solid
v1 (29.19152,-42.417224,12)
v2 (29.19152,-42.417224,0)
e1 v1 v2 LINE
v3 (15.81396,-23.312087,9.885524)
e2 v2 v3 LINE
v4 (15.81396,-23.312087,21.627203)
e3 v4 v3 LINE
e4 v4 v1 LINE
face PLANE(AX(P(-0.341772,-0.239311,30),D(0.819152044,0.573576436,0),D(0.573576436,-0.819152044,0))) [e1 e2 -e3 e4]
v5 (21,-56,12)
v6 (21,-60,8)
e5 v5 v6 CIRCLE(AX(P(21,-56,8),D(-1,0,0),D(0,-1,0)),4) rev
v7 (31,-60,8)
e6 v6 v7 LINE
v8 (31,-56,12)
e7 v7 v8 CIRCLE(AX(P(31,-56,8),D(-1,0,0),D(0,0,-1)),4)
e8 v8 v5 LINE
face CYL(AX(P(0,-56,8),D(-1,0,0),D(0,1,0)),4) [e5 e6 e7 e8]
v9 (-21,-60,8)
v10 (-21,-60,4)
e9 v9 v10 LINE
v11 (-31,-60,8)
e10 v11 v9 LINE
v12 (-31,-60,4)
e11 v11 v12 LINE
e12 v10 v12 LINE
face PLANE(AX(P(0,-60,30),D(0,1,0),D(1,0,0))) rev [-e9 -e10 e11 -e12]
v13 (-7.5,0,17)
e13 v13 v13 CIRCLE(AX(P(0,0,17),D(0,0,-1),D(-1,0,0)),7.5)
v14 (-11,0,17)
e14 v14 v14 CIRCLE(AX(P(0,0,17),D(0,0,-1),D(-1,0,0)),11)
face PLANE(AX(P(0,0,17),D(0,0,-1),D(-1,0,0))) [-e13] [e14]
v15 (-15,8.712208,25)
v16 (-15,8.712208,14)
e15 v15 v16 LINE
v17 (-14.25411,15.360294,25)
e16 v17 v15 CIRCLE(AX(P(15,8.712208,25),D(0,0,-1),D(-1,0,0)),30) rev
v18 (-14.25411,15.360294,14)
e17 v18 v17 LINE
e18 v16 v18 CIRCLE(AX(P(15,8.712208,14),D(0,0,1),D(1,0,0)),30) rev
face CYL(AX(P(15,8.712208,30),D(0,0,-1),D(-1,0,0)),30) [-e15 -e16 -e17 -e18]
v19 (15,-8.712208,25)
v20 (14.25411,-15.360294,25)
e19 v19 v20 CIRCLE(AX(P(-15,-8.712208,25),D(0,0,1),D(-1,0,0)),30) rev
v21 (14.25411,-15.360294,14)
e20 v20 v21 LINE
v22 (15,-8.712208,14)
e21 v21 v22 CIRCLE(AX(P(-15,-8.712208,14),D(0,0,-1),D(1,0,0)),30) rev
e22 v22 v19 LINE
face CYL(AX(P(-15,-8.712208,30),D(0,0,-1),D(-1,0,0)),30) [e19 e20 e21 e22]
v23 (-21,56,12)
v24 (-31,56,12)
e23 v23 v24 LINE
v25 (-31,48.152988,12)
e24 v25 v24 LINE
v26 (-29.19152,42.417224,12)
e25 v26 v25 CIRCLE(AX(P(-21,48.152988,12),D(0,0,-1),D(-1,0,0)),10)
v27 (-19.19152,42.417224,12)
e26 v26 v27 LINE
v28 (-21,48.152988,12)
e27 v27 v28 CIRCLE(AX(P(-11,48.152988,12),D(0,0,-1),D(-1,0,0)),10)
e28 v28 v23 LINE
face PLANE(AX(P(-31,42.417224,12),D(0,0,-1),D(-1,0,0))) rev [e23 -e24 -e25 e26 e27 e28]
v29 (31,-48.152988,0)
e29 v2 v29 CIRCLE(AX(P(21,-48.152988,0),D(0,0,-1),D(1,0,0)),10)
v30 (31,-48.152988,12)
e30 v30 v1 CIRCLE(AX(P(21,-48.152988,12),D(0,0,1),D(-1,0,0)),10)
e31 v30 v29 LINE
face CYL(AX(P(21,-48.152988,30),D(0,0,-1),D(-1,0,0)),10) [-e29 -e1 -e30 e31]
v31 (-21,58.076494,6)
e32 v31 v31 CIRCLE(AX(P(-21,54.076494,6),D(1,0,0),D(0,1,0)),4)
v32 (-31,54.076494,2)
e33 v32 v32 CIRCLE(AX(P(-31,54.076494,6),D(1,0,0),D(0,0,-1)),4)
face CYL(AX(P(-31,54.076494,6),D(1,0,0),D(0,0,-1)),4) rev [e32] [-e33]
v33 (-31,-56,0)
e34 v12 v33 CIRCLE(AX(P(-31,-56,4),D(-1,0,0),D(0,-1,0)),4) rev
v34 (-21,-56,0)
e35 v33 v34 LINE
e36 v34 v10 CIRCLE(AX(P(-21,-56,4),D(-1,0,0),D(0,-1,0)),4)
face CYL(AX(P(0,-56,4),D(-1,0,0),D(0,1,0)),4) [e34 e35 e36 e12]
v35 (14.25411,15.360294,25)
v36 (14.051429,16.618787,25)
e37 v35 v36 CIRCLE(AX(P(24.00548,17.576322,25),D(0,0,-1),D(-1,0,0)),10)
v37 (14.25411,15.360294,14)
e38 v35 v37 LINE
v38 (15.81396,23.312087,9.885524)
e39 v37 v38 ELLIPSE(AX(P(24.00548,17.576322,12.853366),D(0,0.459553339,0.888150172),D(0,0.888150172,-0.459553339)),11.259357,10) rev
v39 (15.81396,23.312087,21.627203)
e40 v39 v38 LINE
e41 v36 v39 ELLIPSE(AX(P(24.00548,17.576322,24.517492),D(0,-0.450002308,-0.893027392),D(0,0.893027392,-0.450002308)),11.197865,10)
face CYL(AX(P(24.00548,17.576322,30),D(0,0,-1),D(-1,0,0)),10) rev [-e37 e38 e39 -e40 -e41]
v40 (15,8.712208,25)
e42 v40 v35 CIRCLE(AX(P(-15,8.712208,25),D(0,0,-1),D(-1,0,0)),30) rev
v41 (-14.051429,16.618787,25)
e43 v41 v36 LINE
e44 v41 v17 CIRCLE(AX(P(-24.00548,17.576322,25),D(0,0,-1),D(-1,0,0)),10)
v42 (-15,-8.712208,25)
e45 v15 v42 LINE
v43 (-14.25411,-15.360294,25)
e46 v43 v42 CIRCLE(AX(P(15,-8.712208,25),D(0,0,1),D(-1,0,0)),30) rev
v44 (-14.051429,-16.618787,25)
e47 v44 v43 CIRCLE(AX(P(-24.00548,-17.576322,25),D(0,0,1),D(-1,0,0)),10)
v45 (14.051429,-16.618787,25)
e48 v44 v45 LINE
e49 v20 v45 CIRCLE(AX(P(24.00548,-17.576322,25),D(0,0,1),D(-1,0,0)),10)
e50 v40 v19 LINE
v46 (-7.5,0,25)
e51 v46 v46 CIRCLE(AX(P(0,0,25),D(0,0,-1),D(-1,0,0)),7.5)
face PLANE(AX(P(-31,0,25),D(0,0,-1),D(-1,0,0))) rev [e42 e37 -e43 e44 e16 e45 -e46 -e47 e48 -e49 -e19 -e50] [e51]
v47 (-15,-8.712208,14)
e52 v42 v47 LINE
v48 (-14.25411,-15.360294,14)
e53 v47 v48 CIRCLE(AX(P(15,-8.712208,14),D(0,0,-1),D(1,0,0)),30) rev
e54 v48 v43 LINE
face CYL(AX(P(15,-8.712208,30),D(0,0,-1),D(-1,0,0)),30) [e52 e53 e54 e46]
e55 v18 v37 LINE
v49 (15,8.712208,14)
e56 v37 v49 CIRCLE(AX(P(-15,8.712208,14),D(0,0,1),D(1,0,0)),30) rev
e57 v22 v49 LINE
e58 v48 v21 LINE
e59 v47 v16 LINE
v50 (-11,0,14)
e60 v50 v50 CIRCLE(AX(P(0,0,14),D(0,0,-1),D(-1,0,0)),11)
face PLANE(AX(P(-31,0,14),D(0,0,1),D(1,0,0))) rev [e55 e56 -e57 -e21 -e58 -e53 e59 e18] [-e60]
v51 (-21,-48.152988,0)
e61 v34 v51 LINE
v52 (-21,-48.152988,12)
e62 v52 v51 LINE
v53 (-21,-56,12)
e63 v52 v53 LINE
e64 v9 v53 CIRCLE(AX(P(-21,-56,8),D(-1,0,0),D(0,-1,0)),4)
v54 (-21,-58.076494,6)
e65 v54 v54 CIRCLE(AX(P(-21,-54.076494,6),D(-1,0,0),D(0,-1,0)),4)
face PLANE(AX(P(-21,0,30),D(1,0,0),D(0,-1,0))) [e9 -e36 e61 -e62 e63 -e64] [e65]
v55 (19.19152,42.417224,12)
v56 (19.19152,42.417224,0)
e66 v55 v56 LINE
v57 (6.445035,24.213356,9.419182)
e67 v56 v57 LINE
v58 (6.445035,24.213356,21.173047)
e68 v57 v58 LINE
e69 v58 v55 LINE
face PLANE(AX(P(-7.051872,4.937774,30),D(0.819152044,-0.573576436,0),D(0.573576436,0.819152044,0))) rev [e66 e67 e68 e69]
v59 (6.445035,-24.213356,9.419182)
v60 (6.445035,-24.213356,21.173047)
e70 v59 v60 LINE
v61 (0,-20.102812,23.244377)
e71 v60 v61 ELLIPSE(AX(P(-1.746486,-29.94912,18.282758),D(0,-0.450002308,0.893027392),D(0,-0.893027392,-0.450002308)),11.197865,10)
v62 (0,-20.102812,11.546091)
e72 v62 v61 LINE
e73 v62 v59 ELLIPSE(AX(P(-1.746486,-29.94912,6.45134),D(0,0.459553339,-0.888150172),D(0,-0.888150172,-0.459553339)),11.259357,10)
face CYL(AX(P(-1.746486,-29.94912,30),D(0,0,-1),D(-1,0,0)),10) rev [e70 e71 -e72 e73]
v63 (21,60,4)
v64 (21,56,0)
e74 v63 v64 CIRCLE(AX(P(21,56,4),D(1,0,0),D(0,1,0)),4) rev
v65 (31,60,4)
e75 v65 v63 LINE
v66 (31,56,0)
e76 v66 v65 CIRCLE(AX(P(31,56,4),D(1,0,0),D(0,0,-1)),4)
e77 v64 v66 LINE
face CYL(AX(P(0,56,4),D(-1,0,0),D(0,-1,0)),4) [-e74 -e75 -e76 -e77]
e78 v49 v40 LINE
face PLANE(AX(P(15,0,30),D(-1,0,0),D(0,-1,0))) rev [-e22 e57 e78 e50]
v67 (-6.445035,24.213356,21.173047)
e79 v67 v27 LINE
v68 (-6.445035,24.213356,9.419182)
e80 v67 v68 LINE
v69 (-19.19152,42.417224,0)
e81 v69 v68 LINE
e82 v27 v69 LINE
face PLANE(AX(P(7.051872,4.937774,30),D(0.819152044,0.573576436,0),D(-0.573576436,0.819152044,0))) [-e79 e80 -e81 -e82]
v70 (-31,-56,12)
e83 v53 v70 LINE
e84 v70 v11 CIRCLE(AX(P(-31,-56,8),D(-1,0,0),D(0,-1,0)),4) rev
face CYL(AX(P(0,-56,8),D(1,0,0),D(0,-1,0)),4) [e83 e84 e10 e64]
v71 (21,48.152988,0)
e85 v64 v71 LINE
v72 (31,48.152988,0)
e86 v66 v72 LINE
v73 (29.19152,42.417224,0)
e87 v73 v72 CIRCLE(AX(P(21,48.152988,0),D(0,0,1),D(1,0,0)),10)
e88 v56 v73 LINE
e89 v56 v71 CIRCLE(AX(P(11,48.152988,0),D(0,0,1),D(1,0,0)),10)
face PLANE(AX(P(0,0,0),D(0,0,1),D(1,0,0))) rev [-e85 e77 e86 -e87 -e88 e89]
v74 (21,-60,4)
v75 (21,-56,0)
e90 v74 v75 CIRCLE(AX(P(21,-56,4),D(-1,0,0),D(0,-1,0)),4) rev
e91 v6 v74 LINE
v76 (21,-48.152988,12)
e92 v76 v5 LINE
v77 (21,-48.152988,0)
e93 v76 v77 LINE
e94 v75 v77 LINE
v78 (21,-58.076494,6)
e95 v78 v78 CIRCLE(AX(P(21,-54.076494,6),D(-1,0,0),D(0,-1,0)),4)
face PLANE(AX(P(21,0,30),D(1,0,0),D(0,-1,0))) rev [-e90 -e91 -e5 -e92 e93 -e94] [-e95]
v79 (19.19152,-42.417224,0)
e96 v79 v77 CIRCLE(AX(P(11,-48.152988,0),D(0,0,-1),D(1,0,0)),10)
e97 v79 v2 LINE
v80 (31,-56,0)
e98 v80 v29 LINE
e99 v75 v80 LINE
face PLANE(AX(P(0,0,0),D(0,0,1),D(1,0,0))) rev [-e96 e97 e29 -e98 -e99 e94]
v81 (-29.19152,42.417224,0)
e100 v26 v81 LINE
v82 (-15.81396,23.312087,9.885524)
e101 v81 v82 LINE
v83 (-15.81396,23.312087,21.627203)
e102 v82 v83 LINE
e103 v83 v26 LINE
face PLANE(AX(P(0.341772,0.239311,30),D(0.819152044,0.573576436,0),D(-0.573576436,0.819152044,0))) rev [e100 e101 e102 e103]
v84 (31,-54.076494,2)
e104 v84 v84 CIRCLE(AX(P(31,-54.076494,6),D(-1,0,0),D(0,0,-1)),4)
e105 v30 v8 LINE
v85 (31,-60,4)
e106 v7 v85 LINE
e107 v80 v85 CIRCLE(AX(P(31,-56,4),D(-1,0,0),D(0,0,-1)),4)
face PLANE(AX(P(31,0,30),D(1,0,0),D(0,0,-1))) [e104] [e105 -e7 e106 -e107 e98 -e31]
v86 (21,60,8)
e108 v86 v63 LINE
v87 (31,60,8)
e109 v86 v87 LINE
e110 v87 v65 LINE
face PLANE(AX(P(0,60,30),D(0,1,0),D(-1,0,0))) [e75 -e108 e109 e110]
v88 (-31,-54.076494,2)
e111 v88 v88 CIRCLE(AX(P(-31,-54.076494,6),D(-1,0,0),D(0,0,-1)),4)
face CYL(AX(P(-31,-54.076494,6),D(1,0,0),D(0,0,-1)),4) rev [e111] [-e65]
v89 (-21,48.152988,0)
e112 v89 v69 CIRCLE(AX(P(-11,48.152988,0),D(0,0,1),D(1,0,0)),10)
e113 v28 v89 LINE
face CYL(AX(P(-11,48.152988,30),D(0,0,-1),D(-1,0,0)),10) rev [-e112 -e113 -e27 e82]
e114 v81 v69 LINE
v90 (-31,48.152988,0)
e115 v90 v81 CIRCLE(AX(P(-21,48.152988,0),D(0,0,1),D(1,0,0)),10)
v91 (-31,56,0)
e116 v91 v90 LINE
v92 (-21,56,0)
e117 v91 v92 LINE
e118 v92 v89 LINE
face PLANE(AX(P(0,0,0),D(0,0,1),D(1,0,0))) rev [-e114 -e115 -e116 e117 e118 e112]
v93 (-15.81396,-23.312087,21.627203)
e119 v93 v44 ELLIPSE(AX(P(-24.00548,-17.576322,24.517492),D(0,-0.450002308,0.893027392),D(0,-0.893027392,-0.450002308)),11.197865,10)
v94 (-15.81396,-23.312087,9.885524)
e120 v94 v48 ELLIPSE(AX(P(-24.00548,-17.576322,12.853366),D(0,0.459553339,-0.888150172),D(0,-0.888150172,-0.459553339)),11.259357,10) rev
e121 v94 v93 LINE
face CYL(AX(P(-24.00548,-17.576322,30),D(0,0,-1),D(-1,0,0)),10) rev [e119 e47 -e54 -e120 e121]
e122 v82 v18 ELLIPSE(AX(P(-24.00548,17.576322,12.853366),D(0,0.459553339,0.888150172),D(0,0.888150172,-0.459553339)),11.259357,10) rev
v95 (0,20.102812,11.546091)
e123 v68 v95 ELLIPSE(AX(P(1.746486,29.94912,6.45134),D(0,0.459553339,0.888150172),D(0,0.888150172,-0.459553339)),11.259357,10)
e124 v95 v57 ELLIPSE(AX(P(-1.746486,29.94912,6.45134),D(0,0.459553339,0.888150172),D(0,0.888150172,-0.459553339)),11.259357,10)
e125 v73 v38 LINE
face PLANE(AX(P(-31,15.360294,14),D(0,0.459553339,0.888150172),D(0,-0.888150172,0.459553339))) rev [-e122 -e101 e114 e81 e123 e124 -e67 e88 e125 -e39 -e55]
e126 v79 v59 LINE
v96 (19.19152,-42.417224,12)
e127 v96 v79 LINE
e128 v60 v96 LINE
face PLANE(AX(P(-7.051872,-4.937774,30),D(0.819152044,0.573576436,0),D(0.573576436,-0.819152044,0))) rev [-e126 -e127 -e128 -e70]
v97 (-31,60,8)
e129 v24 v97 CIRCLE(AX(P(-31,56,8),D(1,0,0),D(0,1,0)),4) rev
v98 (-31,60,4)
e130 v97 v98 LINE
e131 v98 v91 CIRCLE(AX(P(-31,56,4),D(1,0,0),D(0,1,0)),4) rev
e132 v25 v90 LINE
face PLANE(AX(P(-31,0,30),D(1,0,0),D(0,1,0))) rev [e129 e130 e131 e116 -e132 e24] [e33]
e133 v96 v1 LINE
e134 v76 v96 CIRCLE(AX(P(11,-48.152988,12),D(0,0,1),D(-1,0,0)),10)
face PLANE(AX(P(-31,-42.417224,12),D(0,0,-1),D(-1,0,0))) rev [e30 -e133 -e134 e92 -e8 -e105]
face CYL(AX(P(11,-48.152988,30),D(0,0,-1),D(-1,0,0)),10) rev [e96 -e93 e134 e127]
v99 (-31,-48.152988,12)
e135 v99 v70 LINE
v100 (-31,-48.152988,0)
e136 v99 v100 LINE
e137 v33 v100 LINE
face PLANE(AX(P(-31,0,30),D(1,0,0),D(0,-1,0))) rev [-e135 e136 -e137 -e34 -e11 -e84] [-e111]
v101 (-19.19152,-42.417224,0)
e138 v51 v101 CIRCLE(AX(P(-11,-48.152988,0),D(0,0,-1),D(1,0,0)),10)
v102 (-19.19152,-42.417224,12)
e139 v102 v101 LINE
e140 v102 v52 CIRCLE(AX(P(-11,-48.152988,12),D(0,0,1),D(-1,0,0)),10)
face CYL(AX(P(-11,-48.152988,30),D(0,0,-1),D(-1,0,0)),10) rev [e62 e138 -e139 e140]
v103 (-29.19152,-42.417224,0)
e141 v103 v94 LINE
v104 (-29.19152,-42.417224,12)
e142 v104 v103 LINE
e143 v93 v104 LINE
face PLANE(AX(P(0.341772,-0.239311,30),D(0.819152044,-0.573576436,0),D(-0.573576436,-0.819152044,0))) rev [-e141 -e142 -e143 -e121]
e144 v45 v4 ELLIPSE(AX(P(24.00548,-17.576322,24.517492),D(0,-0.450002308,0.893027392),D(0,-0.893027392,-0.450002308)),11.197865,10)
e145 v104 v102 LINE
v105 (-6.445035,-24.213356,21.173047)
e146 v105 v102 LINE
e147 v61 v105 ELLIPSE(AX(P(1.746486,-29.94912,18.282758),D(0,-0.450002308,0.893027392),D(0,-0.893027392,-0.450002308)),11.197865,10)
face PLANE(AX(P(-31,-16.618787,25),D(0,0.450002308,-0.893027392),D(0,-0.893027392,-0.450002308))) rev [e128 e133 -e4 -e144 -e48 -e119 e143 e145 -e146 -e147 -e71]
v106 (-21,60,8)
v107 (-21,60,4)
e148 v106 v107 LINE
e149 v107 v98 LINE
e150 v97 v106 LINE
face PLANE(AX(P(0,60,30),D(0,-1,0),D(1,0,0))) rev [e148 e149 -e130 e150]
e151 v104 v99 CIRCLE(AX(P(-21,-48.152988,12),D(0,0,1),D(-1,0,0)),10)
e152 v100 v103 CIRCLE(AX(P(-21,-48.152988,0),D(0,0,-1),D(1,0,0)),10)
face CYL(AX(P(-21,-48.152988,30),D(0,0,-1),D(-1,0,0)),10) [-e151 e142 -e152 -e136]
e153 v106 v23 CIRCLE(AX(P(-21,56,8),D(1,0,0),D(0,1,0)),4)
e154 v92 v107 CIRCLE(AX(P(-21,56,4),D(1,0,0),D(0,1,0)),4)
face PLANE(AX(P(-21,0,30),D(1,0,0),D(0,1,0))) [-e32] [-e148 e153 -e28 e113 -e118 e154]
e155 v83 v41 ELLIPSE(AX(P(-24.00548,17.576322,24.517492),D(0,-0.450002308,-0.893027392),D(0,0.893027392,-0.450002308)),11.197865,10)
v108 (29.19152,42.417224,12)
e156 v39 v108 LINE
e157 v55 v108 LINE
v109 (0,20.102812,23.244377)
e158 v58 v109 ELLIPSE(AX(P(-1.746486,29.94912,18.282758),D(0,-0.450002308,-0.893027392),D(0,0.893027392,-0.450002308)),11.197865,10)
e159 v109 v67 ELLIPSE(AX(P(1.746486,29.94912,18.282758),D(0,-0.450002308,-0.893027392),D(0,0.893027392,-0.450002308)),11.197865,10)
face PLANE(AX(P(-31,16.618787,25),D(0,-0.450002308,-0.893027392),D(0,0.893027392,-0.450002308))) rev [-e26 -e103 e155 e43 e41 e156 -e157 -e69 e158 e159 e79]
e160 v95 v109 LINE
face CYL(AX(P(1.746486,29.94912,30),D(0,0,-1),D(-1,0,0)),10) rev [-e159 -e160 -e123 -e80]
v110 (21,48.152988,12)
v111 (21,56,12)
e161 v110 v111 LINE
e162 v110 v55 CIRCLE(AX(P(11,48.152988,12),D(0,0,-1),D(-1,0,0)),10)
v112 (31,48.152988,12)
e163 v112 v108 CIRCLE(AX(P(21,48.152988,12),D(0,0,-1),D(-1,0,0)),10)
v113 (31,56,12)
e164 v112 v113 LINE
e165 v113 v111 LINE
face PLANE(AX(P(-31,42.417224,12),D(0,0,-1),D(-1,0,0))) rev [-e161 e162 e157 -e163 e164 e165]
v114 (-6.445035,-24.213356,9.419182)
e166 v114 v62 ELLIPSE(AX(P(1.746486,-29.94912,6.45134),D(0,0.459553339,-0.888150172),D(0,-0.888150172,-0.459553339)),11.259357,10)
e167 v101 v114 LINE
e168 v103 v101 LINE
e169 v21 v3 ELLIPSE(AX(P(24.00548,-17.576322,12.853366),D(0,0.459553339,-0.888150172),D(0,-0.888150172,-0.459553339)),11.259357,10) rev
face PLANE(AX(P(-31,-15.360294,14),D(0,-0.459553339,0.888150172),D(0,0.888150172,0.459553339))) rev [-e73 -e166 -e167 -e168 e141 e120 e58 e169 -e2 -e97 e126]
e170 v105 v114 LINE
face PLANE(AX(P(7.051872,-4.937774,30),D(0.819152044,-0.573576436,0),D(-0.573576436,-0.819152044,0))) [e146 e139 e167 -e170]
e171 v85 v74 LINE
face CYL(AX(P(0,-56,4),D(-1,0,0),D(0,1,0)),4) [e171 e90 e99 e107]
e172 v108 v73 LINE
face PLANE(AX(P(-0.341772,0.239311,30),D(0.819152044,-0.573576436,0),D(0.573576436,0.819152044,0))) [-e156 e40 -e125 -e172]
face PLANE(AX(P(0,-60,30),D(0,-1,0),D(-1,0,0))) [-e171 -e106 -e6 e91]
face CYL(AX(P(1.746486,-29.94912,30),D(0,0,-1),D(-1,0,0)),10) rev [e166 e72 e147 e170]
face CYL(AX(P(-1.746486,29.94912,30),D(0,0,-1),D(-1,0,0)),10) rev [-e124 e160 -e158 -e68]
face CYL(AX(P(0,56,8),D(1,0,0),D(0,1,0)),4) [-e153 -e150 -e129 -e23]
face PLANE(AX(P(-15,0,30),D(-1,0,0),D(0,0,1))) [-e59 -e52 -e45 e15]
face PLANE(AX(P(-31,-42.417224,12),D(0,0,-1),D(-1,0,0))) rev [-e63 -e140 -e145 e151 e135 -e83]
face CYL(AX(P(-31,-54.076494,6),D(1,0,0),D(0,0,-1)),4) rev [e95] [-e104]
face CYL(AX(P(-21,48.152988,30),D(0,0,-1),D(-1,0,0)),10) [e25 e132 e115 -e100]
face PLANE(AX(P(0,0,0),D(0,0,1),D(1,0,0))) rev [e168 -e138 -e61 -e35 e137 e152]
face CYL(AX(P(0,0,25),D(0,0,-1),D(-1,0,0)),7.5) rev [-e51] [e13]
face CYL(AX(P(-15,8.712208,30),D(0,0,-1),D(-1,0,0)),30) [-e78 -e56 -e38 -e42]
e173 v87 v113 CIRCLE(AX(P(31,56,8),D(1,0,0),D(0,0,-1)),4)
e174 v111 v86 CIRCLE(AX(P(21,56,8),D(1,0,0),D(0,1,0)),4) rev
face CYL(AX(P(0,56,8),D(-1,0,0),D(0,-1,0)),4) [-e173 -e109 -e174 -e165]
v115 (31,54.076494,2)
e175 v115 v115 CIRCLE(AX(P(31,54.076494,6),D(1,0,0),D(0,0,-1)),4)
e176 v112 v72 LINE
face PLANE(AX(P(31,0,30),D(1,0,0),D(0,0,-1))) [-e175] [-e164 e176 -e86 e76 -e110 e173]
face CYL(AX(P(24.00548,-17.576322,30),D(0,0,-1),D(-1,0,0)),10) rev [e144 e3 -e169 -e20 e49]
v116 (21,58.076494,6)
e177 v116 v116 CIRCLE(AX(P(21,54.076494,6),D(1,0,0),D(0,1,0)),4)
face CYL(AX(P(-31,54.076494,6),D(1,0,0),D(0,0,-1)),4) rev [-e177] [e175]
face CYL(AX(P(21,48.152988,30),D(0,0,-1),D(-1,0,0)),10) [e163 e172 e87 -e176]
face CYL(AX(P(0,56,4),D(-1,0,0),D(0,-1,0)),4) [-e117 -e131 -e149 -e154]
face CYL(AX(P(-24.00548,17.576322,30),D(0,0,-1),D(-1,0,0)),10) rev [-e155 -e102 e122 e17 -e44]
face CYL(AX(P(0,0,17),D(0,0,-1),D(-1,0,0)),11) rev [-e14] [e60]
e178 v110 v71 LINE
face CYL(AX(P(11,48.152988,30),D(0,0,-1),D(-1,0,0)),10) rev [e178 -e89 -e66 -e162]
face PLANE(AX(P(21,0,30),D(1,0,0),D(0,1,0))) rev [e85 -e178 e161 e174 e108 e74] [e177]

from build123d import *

# Parameters (mm, degrees)
BOSS_EXTRUDE1_DEPTH     = 30
CUT_EXTRUDE1_DEPTH      = 74.898579147
CUT_EXTRUDE1_DEPTH_BACK = 74.898579147
FILLET1_R               = 10
FILLET2_R               = 30
CUT_EXTRUDE2_DEPTH      = 73.01388755
CUT_EXTRUDE2_DEPTH_BACK = 73.01388755
FILLET3_R               = 10
SKETCH4_R               = 4
CUT_EXTRUDE3_DEPTH      = 90.827612681
FILLET4_R               = 4
SKETCH5_R               = 11
SKETCH5_R_2             = 7.5
CUT_EXTRUDE4_DEPTH      = 3
SKETCH5_2_R             = 7.5
CUT_EXTRUDE6_DEPTH      = 69.971008402


with BuildPart() as part:
    # Sketch1 → Boss-Extrude1 (new body)
    with BuildSketch(Plane.XY):
        with BuildLine():
            Line((-21, 48.152987889), (-21, 60))
            Line((-21, 60), (-31, 60))
            Line((-31, 60), (-31, 48.152987889))
            ThreePointArc((-31, 48.152987889), (-30.537169507, 45.145929894), (-29.191520443, 42.417223525))
            Line((-29.191520443, 42.417223525), (-11.127260537, 16.618786747))
            ThreePointArc((-11.127260537, 16.618786747), (-13.173135996, 15.048869992), (-15, 13.228756555))
            Line((-15, 13.228756555), (-15, 0))
            Line((-15, 0), (15, 0))
            Line((15, 0), (15, 13.228756555))
            ThreePointArc((15, 13.228756555), (13.173135996, 15.048869992), (11.127260537, 16.618786747))
            Line((11.127260537, 16.618786747), (29.191520443, 42.417223525))
            ThreePointArc((29.191520443, 42.417223525), (30.537169507, 45.145929894), (31, 48.152987889))
            Line((31, 48.152987889), (31, 60))
            Line((31, 60), (21, 60))
            Line((21, 60), (21, 48.152987889))
            ThreePointArc((21, 48.152987889), (20.537169507, 45.145929894), (19.191520443, 42.417223525))
            Line((19.191520443, 42.417223525), (3.302564109, 19.725442208))
            ThreePointArc((3.302564109, 19.725442208), (0, 20), (-3.302564109, 19.725442208))
            Line((-3.302564109, 19.725442208), (-19.191520443, 42.417223525))
            ThreePointArc((-19.191520443, 42.417223525), (-20.537169507, 45.145929894), (-21, 48.152987889))
        make_face()
    extrude(amount=BOSS_EXTRUDE1_DEPTH)

    # Sketch2 → Cut-Extrude1 (cut, two sides: drawn at the far end of the back side and taken through both)
    with BuildSketch(Plane(origin=(0, 0, 0), x_dir=(0, 0, -1), z_dir=(1, 0, 0)).offset(-CUT_EXTRUDE1_DEPTH_BACK)):
        Polygon((-25, 0), (-25, 16.618786747), (-12, 42.417223525), (-12, 60), (-30, 60), (-30, 0), align=None)
    extrude(amount=CUT_EXTRUDE1_DEPTH + CUT_EXTRUDE1_DEPTH_BACK, mode=Mode.SUBTRACT)

    # Fillet1
    # the kernel refuses this fillet: 10 mm, written as the material it adds along each edge
    with BuildSketch(Plane(origin=(11.127260537, 16.618786747, 0), x_dir=(0.75244349959859, -0.6586567997916871, 0), z_dir=(0, 0, 1))) as fillet1_piece_1_section:
        with BuildLine():
            CenterArc((9.059445237, 9.202818325), FILLET1_R, 186.19751299, 60.769805767)
            Line((-0.882111272, 8.123256295), (-1.080942402, 8.101665055))
            Line((-1.080942402, 8.101665055), (-0.19883113, -0.021591241))
            Line((-0.19883113, -0.021591241), (0.02573442, -0.198337439))
            ThreePointArc((0.02573442, -0.198337439), (2.573442036, -0.033743875), (5.068632849, -0.184056367))
            Line((5.068632849, -0.184056367), (5.146884072, 0))
        make_face()
    fillet1_piece_1 = extrude(amount=25, mode=Mode.PRIVATE)
    fillet1_piece_1 = split(fillet1_piece_1, bisect_by=Plane(origin=(13.208648134, 22.312499117, 22.130901324), z_dir=(0, -0.4500023080786392, -0.8930273919224972)), keep=Keep.TOP, mode=Mode.PRIVATE)
    add(fillet1_piece_1)
    with BuildSketch(Plane(origin=(-11.127260537, 16.618786747, 0), x_dir=(-0.573576436351047, 0.819152044288991, 0), z_dir=(0, 0, 1))) as fillet1_piece_2_section:
        with BuildLine():
            CenterArc((8.171010533, 10), FILLET1_R, 209.230194233, 60.769805767)
            Line((-0.555638062, 5.116803885), (-0.730171033, 5.019139963))
            ThreePointArc((-0.730171033, 5.019139963), (-0.311365695, 2.554759082), (-0.199956476, 0.004172263))
            Line((-0.199956476, 0.004172263), (0, -0.2))
            Line((0, -0.2), (8.171010533, -0.2))
            Line((8.171010533, -0.2), (8.171010533, 0))
        make_face()
    fillet1_piece_2 = extrude(amount=25, mode=Mode.PRIVATE)
    fillet1_piece_2 = split(fillet1_piece_2, bisect_by=Plane(origin=(-15.334467923, 27.154175935, 19.691148901), z_dir=(0, -0.4500023080786392, -0.8930273919224972)), keep=Keep.TOP, mode=Mode.PRIVATE)
    add(fillet1_piece_2)

    # Fillet2
    fillet2_edges = [part.edges().sort_by_distance(p)[0] for p in [
        (-15, 13.228756555, 12.5),
        (15, 13.228756555, 12.5),
    ]]
    fillet(fillet2_edges, radius=FILLET2_R)

    # Sketch3 → Cut-Extrude2 (cut, two sides: drawn at the far end of the back side and taken through both)
    with BuildSketch(Plane(origin=(0, 0, 0), x_dir=(0, 0, -1), z_dir=(1, 0, 0)).offset(-CUT_EXTRUDE2_DEPTH_BACK)):
        Polygon((-14, 0), (-14, 15.360293774), (0, 42.417223525), (0, 0), align=None)
    extrude(amount=CUT_EXTRUDE2_DEPTH + CUT_EXTRUDE2_DEPTH_BACK, mode=Mode.SUBTRACT)

    # Fillet3
    # the kernel refuses this fillet: 10 mm, written as the material it adds along each edge
    with BuildSketch(Plane(origin=(3.302564109, 19.725442208, -1.95547457), x_dir=(-0.9985520834372477, 0.053793463014867454, 0), z_dir=(0, 0, 1))) as fillet3_piece_1_section:
        with BuildLine():
            CenterArc((5.591706065, -9.937268887), FILLET3_R, 96.421055445, 51.662571373)
            Line((-2.896500368, -4.650459684), (0, 0))
            ThreePointArc((0, 0), (2.236682426, -0.125462226), (4.473364852, 0))
        make_face()
    fillet3_piece_1 = extrude(amount=39.086837339, mode=Mode.PRIVATE)
    fillet3_piece_1 = split(fillet3_piece_1, bisect_by=Plane(origin=(3.109386203, 18.47326219, 12.38926448), z_dir=(0, 0.45955333907229245, 0.888150172294926)), keep=Keep.TOP, mode=Mode.PRIVATE)
    fillet3_piece_1 = split(fillet3_piece_1, bisect_by=Plane(origin=(3.109386203, 23.215327511, 21.675960227), z_dir=(0, -0.4500023080791268, -0.8930273919222517)), keep=Keep.TOP, mode=Mode.PRIVATE)
    add(fillet3_piece_1)
    with BuildSketch(Plane(origin=(-3.302564109, 19.725442208, -1.95547457), x_dir=(-0.5735764363510474, 0.8191520442889909, 0), z_dir=(0, 0, 1))) as fillet3_piece_2_section:
        with BuildLine():
            CenterArc((5.47873066, -10), FILLET3_R, 90, 51.662571373)
            ThreePointArc((-2.364982647, -3.797084431), (-1.075996396, -1.964871701), (0, 0))
            Line((0, 0), (5.47873066, 0))
        make_face()
    fillet3_piece_2 = extrude(amount=39.086837339, mode=Mode.PRIVATE)
    fillet3_piece_2 = split(fillet3_piece_2, bisect_by=Plane(origin=(-3.109386203, 18.47326219, 12.38926448), z_dir=(0, 0.45955333907229245, 0.888150172294926)), keep=Keep.TOP, mode=Mode.PRIVATE)
    fillet3_piece_2 = split(fillet3_piece_2, bisect_by=Plane(origin=(-3.109386203, 23.215327511, 21.675960227), z_dir=(0, -0.4500023080791268, -0.8930273919222517)), keep=Keep.TOP, mode=Mode.PRIVATE)
    add(fillet3_piece_2)

    # Sketch4 → Cut-Extrude3 (cut, through all)
    with BuildSketch(Plane(origin=(31, 0, 0), x_dir=(0, 0, -1), z_dir=(1, 0, 0))):
        with Locations((-6, 54.076493944)):
            Circle(SKETCH4_R)
    extrude(amount=-CUT_EXTRUDE3_DEPTH, mode=Mode.SUBTRACT)

    # Fillet4
    fillet4_edges = [part.edges().sort_by_distance(p)[0] for p in [
        (-26, 60, 0),
        (26, 60, 0),
        (26, 60, 12),
        (-26, 60, 12),
    ]]
    fillet(fillet4_edges, radius=FILLET4_R)

    # Mirror2: part across plane


with BuildPart() as part_1:
    add(part.part)
    add(part.part.mirror(Plane(origin=(0, 0, 30), x_dir=(0, 0, 1), z_dir=(0, 1, 0))))

    # Sketch5 → Cut-Extrude4 (cut)
    with BuildSketch(Plane(origin=(0, 0, 14), x_dir=(-1, 0, 0), z_dir=(0, 0, -1))):
        Circle(SKETCH5_R)
        Circle(SKETCH5_R_2, mode=Mode.SUBTRACT)
    extrude(amount=-CUT_EXTRUDE4_DEPTH, mode=Mode.SUBTRACT)

    # Sketch5<2> → Cut-Extrude6 (cut, through all)
    with BuildSketch(Plane(origin=(0, 0, 14), x_dir=(-1, 0, 0), z_dir=(0, 0, -1))):
        Circle(SKETCH5_2_R)
    extrude(amount=-CUT_EXTRUDE6_DEPTH, mode=Mode.SUBTRACT)


solid = part_1.part
